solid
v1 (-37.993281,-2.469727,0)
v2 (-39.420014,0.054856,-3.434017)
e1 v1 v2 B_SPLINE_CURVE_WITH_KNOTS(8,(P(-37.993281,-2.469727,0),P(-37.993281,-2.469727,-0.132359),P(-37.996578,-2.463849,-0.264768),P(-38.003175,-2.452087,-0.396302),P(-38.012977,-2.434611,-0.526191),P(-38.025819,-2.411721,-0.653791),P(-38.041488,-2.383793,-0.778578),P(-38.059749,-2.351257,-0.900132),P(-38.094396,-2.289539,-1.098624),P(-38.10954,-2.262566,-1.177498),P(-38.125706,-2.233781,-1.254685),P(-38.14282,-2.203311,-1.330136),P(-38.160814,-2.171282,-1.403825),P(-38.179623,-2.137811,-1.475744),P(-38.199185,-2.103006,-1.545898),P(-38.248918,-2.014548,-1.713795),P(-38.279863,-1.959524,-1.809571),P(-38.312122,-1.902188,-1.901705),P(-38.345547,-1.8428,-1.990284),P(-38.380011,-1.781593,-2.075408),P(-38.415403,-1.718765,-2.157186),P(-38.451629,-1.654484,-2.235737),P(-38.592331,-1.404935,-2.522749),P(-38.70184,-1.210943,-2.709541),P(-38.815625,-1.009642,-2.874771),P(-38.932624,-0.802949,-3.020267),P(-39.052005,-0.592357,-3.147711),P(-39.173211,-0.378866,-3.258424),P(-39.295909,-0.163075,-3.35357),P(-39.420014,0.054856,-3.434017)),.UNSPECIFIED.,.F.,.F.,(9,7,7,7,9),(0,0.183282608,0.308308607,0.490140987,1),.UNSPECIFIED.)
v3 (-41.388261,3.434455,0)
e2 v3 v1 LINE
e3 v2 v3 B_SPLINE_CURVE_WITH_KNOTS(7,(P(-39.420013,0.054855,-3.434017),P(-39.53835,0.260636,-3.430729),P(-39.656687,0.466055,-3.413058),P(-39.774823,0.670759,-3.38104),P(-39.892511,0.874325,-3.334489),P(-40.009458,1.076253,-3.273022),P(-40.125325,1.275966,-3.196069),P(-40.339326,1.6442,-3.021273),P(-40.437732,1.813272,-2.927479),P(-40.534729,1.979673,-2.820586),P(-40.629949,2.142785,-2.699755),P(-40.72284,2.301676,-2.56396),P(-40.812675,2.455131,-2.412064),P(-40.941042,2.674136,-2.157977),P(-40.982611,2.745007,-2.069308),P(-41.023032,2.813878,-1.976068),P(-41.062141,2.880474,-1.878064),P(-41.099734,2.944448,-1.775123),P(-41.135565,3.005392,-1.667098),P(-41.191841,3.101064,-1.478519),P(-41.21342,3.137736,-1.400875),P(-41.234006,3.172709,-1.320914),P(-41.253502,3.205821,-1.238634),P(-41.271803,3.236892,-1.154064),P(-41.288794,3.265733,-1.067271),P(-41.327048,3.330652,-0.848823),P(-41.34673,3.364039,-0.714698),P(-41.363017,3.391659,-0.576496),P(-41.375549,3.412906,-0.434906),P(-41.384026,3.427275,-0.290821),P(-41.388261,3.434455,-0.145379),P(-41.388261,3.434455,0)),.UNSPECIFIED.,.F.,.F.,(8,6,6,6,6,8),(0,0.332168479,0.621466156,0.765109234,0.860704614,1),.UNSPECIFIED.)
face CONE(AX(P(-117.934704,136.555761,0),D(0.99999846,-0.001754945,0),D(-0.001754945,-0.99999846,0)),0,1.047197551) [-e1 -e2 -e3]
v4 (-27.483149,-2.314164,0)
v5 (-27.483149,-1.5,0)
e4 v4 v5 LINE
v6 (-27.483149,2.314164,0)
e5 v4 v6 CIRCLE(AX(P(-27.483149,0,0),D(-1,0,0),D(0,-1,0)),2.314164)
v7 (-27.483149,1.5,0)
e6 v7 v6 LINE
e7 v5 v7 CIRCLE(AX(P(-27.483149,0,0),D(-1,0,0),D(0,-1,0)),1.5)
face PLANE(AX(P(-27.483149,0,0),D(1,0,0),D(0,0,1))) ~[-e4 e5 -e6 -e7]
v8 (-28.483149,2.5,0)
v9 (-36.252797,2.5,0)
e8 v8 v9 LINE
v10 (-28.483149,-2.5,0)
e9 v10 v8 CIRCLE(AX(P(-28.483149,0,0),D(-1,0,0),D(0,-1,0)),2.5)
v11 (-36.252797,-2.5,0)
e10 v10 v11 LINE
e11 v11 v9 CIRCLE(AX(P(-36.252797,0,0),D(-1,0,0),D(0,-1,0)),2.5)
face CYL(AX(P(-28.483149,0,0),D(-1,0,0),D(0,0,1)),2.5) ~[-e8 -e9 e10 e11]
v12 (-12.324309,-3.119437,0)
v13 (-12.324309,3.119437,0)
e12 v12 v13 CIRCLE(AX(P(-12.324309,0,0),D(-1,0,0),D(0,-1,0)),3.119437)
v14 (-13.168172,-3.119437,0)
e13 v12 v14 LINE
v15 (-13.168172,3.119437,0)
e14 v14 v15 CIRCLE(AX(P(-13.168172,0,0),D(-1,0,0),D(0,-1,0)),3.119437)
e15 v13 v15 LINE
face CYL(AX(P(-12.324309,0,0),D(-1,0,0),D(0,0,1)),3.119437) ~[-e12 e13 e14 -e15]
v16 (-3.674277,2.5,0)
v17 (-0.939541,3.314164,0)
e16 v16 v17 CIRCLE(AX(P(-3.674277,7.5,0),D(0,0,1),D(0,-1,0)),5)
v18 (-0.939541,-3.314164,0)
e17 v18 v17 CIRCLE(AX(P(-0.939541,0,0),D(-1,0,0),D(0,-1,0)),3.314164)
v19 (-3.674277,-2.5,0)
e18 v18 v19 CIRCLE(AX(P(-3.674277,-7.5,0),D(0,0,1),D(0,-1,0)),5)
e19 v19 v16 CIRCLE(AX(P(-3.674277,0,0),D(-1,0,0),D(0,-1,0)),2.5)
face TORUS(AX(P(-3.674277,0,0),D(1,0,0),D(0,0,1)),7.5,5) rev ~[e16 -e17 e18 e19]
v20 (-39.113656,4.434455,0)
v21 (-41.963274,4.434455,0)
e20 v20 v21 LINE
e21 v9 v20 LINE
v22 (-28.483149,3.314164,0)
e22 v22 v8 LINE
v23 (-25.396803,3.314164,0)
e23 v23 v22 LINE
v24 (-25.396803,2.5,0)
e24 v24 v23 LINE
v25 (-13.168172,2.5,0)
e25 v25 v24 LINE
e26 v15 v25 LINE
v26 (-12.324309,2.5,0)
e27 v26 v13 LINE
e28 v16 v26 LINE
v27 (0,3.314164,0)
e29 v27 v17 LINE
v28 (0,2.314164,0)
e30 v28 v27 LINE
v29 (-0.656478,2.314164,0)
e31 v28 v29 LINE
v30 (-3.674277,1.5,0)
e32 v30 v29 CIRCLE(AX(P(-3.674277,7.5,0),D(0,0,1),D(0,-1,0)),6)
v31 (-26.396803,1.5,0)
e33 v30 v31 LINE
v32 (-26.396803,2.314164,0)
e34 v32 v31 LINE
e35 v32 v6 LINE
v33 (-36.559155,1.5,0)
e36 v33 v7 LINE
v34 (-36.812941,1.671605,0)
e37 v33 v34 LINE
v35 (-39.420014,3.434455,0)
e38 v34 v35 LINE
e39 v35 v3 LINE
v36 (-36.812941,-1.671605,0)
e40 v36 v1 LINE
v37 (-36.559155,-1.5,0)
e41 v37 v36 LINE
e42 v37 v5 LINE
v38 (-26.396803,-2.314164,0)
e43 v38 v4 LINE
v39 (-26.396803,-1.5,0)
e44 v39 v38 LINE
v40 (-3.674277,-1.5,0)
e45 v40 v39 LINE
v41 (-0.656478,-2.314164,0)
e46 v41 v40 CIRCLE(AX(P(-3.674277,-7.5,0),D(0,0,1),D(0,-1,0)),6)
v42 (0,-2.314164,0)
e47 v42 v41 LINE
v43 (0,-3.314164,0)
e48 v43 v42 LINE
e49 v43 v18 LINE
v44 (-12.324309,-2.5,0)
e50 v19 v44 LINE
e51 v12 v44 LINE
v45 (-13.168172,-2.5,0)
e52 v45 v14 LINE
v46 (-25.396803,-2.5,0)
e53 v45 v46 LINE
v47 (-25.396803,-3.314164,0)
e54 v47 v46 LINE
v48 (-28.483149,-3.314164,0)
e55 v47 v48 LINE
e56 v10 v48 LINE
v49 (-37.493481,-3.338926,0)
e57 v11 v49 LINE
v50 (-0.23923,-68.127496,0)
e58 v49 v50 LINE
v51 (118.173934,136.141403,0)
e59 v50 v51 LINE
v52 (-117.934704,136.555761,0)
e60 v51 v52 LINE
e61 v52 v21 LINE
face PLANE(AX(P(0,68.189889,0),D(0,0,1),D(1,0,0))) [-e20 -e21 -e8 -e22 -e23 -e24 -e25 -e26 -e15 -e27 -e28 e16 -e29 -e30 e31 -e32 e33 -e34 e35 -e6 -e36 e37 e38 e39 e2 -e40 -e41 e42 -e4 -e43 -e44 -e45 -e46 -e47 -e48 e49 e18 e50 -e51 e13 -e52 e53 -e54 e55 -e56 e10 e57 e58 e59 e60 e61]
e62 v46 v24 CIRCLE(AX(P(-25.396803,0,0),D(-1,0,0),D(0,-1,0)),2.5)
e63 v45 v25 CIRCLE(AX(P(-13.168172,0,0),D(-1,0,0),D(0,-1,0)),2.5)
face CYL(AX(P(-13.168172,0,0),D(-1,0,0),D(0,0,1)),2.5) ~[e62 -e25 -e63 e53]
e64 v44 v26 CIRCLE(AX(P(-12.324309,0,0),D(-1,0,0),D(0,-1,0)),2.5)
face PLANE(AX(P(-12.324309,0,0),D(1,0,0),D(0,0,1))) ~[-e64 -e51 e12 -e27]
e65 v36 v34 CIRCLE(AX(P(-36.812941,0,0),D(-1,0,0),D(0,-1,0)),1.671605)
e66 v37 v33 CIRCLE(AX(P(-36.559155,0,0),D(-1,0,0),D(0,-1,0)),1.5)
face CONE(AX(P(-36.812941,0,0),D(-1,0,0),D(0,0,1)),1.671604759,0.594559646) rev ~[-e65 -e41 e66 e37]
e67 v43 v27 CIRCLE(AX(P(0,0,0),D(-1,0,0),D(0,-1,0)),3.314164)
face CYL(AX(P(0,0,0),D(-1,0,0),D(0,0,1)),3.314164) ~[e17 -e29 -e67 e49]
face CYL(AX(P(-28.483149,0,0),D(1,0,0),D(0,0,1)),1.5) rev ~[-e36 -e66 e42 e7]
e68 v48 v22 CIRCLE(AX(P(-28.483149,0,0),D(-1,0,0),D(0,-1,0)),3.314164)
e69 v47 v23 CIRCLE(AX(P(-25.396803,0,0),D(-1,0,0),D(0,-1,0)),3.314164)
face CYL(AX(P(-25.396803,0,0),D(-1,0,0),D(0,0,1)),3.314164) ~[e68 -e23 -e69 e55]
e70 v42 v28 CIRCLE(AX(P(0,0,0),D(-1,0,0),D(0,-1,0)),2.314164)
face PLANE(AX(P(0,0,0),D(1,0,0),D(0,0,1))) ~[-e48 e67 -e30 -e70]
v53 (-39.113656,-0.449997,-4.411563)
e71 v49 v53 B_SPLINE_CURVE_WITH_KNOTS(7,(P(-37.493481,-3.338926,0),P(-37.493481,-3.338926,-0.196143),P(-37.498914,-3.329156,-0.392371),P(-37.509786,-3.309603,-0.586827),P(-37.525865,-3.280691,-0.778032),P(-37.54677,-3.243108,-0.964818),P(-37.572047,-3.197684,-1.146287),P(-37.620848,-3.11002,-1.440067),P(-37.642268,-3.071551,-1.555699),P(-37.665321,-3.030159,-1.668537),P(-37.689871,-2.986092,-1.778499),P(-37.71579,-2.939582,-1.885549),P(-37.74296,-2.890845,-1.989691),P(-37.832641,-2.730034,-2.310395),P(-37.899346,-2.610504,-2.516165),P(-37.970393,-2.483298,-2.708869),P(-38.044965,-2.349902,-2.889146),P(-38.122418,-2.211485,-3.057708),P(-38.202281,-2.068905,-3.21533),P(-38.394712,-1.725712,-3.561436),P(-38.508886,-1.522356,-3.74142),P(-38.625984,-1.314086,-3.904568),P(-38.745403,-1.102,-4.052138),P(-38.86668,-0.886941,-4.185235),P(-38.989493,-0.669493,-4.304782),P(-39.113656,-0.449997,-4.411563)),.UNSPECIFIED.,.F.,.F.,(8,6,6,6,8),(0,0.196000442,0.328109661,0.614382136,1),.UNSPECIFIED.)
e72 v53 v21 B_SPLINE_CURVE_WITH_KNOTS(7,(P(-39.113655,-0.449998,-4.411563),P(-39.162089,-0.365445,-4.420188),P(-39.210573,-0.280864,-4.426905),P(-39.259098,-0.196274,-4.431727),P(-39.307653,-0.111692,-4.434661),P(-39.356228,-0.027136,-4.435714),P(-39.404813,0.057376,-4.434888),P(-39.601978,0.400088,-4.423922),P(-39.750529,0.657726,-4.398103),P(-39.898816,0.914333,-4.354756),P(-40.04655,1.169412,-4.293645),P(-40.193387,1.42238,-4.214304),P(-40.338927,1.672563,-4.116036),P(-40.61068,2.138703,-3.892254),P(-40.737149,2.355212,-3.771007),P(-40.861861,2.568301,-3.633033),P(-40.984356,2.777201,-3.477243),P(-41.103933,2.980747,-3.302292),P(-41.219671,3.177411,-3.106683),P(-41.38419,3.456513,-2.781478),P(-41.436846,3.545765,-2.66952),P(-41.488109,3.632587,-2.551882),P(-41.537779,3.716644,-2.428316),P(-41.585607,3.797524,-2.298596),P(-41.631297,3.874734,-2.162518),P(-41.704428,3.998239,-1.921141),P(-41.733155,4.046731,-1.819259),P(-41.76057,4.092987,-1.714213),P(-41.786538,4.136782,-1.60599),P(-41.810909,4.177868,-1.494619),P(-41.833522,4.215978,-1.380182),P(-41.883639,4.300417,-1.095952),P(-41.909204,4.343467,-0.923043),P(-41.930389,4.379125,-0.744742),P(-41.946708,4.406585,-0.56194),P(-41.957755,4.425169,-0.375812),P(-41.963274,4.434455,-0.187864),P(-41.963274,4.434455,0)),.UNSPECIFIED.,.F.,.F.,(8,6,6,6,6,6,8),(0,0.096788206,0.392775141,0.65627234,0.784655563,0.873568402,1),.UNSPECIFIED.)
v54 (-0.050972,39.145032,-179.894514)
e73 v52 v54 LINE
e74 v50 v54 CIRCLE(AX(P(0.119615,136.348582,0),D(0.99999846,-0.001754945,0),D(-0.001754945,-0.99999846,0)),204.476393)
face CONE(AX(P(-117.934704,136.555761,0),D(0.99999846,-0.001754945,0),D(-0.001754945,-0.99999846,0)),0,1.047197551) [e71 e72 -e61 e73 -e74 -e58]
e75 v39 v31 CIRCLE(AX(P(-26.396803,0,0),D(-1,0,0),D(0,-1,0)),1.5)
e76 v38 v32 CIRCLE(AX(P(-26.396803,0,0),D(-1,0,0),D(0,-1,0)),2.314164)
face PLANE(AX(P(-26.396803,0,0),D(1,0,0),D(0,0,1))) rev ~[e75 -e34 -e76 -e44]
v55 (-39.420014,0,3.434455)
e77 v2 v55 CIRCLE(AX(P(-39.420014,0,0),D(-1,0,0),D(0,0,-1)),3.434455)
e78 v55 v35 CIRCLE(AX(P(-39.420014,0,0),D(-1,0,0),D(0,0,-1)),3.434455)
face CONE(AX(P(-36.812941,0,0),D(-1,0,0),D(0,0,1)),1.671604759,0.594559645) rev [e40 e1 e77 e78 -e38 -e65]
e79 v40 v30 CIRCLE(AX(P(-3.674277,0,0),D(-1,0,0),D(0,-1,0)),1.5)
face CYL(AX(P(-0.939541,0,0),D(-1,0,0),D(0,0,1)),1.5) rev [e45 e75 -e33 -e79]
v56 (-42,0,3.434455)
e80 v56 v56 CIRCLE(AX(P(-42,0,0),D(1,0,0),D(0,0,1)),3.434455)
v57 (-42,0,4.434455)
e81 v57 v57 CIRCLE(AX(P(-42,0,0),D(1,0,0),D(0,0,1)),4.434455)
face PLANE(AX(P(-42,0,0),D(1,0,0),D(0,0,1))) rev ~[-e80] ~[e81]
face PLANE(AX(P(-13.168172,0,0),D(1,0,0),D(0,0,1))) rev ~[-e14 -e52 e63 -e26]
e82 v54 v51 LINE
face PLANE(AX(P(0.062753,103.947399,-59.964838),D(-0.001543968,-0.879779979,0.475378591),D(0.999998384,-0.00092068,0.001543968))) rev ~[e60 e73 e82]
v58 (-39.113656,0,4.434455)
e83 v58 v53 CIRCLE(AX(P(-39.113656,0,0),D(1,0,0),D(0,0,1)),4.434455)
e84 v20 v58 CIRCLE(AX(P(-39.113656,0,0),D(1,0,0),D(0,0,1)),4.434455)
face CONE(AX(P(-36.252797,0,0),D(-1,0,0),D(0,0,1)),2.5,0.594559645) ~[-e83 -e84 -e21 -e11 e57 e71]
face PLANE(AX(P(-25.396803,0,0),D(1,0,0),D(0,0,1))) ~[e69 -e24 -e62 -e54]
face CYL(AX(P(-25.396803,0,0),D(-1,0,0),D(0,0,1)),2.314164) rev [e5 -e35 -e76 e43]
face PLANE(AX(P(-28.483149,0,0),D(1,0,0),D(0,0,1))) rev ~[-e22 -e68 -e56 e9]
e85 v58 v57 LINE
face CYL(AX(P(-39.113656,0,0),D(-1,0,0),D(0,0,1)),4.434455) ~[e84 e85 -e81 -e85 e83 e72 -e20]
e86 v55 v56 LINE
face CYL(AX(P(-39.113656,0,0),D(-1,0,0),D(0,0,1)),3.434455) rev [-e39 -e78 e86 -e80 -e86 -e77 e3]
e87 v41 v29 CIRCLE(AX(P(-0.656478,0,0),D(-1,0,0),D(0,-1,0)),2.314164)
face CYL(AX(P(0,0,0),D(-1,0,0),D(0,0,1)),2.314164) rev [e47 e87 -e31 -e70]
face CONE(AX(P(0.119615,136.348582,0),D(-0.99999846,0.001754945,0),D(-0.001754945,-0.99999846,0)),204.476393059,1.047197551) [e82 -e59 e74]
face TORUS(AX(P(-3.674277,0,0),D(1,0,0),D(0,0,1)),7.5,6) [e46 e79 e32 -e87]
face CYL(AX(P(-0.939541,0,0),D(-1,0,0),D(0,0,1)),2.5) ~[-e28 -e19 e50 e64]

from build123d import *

# Parameters (mm, degrees)
F5_T     = 1
F7_ANGLE = 61.6159971065


# Not quite as in the source:
# - a fillet or chamfer that OpenCascade refuses, or shapes differently, is made with other operations: its cross-section is extruded or revolved along the edge and cut away or added
# - a feature of the source that left no trace in its solid (it failed there, or was rolled back) is left out
# - a shell that OpenCascade refuses in one call is made with other operations: the cavity is built on its own and cut out


with BuildPart() as f1:
    # F0 (on Front) → F1 (revolve)
    with BuildSketch(Plane.XZ):
        Polygon((-42, 4.4344547205), (-42, 0), (0, 0), (0, 3.3141644672), (-0.939540565, 3.3141644672), (-0.939540565, 2.5), (-12.3243089765, 2.5), (-12.3243089765, 3.1194374897), (-13.1681719795, 3.1194374897), (-13.1681719795, 2.5), (-25.396803394, 2.5), (-25.396803394, 3.3141644672), (-28.4831486642, 3.3141644672), (-28.4831486642, 2.5), (-36.2527966499, 2.5), (-39.1136556864, 4.4344547205), align=None)
    revolve(axis=Axis((-21, 0, 0), (1, 0, 0)))

    # F4: fillet of radius 5 on 1 edges, made by hand

    # F4_s1 → F4_t2 (revolve)
    with BuildSketch(Plane.XZ):
        with BuildLine():
            ThreePointArc((-0.939540565, 3.3141644672), (-2.2475981784, 2.7078617683), (-3.6742765472, 2.5))
            Line((-3.6742765472, 2.5), (-0.939540565, 2.5))
            Line((-0.939540565, 2.5), (-0.939540565, 3.3141644672))
        make_face()
    revolve(axis=Axis((-0.939540565, 0, 0), (1, 0, 0)))

    # F5: shell of thickness 1, made by hand


with BuildPart() as f5_core1:
    # F5_t2: copy of F1
    add(f1.part)

    # the walls: a layer under each face that stays
    f5_faces = [f5_core1.faces().sort_by_distance(p)[0] for p in [
        (-40.5568278432, 0, -4.4344547205),
        (-37.6832261682, 0, -3.4672273602),
        (-32.3679726571, 0, -2.5),
        (-28.4831486642, 2.2094429781, -2.2094429781),
        (-26.9399760291, 0, -3.3141644672),
        (-25.396803394, 2.2094429781, 2.2094429781),
        (-19.2824876867, 0, -2.5),
        (-13.1681719795, 2.0796249931, -2.0796249931),
        (-12.746240478, 0, -3.1194374897),
        (-12.3243089765, 2.0796249931, 2.0796249931),
        (-7.9992927619, 0, -2.5),
        (-2.2475981784, 0, -2.7078617683),
        (-0.4697702825, 0, -3.3141644672),
    ]]
    thicken(f5_faces, amount=-F5_T, mode=Mode.SUBTRACT)

    # F5_s3 → F5_t4 (revolve, cut)
    with BuildSketch(Plane.XZ):
        Polygon((-36.2471952097, 2.5182839524), (-36.8129406711, 1.6716047589), (-36.5591549299, 1.5), (-36.2527966499, 1.5), align=None)
    revolve(axis=Axis((-36.2527966499, 0, 0), (1, 0, 0)), mode=Mode.SUBTRACT)

    # F5_s5 → F5_t6 (revolve, cut)
    with BuildSketch(Plane.XZ):
        Polygon((-28.4931486642, 2.51), (-28.4831486642, 1.5), (-27.4831486642, 1.5), (-27.4831486642, 2.5), align=None)
    revolve(axis=Axis((-28.4831486642, 0, 0), (1, 0, 0)), mode=Mode.SUBTRACT)

    # F5_s7 → F5_t8 (revolve, cut)
    with BuildSketch(Plane.XZ):
        Polygon((-25.386803394, 2.51), (-26.396803394, 2.5), (-26.396803394, 1.5), (-25.396803394, 1.5), align=None)
    revolve(axis=Axis((-25.396803394, 0, 0), (1, 0, 0)), mode=Mode.SUBTRACT)

    # F5_s9 → F5_t10 (revolve, cut)
    with BuildSketch(Plane.XZ):
        Polygon((-13.1781719795, 2.51), (-13.1681719795, 1.5), (-12.1681719795, 1.5), (-12.1681719795, 2.5), align=None)
    revolve(axis=Axis((-13.1681719795, 0, 0), (1, 0, 0)), mode=Mode.SUBTRACT)

    # F5_s11 → F5_t12 (revolve, cut)
    with BuildSketch(Plane.XZ):
        Polygon((-12.3143089765, 2.51), (-13.3243089765, 2.5), (-13.3243089765, 1.5), (-12.3243089765, 1.5), align=None)
    revolve(axis=Axis((-12.3243089765, 0, 0), (1, 0, 0)), mode=Mode.SUBTRACT)


with BuildPart() as f1_1:
    add(f1.part)

    # what is left inside the walls is the cavity
    f5_cavity = [f5_core1.part.solids().sort_by_distance(p)[0] for p in [
        (-18.822628, 0, -1.49),
    ]]
    add(f5_cavity, mode=Mode.SUBTRACT)

    # F6 (on Top) → F7 (revolve)
    with BuildSketch(Plane.XY):
        Polygon((-0.2392299093, -68.1274962625), (118.1739337362, 136.1414027413), (-117.9347038269, 136.5557610989), align=None)
    revolve(axis=Axis((0.1196149546, 136.3485819201, 0), (0.9999984601, -0.0017549452, 0)), revolution_arc=F7_ANGLE)


solid = f1_1.part
